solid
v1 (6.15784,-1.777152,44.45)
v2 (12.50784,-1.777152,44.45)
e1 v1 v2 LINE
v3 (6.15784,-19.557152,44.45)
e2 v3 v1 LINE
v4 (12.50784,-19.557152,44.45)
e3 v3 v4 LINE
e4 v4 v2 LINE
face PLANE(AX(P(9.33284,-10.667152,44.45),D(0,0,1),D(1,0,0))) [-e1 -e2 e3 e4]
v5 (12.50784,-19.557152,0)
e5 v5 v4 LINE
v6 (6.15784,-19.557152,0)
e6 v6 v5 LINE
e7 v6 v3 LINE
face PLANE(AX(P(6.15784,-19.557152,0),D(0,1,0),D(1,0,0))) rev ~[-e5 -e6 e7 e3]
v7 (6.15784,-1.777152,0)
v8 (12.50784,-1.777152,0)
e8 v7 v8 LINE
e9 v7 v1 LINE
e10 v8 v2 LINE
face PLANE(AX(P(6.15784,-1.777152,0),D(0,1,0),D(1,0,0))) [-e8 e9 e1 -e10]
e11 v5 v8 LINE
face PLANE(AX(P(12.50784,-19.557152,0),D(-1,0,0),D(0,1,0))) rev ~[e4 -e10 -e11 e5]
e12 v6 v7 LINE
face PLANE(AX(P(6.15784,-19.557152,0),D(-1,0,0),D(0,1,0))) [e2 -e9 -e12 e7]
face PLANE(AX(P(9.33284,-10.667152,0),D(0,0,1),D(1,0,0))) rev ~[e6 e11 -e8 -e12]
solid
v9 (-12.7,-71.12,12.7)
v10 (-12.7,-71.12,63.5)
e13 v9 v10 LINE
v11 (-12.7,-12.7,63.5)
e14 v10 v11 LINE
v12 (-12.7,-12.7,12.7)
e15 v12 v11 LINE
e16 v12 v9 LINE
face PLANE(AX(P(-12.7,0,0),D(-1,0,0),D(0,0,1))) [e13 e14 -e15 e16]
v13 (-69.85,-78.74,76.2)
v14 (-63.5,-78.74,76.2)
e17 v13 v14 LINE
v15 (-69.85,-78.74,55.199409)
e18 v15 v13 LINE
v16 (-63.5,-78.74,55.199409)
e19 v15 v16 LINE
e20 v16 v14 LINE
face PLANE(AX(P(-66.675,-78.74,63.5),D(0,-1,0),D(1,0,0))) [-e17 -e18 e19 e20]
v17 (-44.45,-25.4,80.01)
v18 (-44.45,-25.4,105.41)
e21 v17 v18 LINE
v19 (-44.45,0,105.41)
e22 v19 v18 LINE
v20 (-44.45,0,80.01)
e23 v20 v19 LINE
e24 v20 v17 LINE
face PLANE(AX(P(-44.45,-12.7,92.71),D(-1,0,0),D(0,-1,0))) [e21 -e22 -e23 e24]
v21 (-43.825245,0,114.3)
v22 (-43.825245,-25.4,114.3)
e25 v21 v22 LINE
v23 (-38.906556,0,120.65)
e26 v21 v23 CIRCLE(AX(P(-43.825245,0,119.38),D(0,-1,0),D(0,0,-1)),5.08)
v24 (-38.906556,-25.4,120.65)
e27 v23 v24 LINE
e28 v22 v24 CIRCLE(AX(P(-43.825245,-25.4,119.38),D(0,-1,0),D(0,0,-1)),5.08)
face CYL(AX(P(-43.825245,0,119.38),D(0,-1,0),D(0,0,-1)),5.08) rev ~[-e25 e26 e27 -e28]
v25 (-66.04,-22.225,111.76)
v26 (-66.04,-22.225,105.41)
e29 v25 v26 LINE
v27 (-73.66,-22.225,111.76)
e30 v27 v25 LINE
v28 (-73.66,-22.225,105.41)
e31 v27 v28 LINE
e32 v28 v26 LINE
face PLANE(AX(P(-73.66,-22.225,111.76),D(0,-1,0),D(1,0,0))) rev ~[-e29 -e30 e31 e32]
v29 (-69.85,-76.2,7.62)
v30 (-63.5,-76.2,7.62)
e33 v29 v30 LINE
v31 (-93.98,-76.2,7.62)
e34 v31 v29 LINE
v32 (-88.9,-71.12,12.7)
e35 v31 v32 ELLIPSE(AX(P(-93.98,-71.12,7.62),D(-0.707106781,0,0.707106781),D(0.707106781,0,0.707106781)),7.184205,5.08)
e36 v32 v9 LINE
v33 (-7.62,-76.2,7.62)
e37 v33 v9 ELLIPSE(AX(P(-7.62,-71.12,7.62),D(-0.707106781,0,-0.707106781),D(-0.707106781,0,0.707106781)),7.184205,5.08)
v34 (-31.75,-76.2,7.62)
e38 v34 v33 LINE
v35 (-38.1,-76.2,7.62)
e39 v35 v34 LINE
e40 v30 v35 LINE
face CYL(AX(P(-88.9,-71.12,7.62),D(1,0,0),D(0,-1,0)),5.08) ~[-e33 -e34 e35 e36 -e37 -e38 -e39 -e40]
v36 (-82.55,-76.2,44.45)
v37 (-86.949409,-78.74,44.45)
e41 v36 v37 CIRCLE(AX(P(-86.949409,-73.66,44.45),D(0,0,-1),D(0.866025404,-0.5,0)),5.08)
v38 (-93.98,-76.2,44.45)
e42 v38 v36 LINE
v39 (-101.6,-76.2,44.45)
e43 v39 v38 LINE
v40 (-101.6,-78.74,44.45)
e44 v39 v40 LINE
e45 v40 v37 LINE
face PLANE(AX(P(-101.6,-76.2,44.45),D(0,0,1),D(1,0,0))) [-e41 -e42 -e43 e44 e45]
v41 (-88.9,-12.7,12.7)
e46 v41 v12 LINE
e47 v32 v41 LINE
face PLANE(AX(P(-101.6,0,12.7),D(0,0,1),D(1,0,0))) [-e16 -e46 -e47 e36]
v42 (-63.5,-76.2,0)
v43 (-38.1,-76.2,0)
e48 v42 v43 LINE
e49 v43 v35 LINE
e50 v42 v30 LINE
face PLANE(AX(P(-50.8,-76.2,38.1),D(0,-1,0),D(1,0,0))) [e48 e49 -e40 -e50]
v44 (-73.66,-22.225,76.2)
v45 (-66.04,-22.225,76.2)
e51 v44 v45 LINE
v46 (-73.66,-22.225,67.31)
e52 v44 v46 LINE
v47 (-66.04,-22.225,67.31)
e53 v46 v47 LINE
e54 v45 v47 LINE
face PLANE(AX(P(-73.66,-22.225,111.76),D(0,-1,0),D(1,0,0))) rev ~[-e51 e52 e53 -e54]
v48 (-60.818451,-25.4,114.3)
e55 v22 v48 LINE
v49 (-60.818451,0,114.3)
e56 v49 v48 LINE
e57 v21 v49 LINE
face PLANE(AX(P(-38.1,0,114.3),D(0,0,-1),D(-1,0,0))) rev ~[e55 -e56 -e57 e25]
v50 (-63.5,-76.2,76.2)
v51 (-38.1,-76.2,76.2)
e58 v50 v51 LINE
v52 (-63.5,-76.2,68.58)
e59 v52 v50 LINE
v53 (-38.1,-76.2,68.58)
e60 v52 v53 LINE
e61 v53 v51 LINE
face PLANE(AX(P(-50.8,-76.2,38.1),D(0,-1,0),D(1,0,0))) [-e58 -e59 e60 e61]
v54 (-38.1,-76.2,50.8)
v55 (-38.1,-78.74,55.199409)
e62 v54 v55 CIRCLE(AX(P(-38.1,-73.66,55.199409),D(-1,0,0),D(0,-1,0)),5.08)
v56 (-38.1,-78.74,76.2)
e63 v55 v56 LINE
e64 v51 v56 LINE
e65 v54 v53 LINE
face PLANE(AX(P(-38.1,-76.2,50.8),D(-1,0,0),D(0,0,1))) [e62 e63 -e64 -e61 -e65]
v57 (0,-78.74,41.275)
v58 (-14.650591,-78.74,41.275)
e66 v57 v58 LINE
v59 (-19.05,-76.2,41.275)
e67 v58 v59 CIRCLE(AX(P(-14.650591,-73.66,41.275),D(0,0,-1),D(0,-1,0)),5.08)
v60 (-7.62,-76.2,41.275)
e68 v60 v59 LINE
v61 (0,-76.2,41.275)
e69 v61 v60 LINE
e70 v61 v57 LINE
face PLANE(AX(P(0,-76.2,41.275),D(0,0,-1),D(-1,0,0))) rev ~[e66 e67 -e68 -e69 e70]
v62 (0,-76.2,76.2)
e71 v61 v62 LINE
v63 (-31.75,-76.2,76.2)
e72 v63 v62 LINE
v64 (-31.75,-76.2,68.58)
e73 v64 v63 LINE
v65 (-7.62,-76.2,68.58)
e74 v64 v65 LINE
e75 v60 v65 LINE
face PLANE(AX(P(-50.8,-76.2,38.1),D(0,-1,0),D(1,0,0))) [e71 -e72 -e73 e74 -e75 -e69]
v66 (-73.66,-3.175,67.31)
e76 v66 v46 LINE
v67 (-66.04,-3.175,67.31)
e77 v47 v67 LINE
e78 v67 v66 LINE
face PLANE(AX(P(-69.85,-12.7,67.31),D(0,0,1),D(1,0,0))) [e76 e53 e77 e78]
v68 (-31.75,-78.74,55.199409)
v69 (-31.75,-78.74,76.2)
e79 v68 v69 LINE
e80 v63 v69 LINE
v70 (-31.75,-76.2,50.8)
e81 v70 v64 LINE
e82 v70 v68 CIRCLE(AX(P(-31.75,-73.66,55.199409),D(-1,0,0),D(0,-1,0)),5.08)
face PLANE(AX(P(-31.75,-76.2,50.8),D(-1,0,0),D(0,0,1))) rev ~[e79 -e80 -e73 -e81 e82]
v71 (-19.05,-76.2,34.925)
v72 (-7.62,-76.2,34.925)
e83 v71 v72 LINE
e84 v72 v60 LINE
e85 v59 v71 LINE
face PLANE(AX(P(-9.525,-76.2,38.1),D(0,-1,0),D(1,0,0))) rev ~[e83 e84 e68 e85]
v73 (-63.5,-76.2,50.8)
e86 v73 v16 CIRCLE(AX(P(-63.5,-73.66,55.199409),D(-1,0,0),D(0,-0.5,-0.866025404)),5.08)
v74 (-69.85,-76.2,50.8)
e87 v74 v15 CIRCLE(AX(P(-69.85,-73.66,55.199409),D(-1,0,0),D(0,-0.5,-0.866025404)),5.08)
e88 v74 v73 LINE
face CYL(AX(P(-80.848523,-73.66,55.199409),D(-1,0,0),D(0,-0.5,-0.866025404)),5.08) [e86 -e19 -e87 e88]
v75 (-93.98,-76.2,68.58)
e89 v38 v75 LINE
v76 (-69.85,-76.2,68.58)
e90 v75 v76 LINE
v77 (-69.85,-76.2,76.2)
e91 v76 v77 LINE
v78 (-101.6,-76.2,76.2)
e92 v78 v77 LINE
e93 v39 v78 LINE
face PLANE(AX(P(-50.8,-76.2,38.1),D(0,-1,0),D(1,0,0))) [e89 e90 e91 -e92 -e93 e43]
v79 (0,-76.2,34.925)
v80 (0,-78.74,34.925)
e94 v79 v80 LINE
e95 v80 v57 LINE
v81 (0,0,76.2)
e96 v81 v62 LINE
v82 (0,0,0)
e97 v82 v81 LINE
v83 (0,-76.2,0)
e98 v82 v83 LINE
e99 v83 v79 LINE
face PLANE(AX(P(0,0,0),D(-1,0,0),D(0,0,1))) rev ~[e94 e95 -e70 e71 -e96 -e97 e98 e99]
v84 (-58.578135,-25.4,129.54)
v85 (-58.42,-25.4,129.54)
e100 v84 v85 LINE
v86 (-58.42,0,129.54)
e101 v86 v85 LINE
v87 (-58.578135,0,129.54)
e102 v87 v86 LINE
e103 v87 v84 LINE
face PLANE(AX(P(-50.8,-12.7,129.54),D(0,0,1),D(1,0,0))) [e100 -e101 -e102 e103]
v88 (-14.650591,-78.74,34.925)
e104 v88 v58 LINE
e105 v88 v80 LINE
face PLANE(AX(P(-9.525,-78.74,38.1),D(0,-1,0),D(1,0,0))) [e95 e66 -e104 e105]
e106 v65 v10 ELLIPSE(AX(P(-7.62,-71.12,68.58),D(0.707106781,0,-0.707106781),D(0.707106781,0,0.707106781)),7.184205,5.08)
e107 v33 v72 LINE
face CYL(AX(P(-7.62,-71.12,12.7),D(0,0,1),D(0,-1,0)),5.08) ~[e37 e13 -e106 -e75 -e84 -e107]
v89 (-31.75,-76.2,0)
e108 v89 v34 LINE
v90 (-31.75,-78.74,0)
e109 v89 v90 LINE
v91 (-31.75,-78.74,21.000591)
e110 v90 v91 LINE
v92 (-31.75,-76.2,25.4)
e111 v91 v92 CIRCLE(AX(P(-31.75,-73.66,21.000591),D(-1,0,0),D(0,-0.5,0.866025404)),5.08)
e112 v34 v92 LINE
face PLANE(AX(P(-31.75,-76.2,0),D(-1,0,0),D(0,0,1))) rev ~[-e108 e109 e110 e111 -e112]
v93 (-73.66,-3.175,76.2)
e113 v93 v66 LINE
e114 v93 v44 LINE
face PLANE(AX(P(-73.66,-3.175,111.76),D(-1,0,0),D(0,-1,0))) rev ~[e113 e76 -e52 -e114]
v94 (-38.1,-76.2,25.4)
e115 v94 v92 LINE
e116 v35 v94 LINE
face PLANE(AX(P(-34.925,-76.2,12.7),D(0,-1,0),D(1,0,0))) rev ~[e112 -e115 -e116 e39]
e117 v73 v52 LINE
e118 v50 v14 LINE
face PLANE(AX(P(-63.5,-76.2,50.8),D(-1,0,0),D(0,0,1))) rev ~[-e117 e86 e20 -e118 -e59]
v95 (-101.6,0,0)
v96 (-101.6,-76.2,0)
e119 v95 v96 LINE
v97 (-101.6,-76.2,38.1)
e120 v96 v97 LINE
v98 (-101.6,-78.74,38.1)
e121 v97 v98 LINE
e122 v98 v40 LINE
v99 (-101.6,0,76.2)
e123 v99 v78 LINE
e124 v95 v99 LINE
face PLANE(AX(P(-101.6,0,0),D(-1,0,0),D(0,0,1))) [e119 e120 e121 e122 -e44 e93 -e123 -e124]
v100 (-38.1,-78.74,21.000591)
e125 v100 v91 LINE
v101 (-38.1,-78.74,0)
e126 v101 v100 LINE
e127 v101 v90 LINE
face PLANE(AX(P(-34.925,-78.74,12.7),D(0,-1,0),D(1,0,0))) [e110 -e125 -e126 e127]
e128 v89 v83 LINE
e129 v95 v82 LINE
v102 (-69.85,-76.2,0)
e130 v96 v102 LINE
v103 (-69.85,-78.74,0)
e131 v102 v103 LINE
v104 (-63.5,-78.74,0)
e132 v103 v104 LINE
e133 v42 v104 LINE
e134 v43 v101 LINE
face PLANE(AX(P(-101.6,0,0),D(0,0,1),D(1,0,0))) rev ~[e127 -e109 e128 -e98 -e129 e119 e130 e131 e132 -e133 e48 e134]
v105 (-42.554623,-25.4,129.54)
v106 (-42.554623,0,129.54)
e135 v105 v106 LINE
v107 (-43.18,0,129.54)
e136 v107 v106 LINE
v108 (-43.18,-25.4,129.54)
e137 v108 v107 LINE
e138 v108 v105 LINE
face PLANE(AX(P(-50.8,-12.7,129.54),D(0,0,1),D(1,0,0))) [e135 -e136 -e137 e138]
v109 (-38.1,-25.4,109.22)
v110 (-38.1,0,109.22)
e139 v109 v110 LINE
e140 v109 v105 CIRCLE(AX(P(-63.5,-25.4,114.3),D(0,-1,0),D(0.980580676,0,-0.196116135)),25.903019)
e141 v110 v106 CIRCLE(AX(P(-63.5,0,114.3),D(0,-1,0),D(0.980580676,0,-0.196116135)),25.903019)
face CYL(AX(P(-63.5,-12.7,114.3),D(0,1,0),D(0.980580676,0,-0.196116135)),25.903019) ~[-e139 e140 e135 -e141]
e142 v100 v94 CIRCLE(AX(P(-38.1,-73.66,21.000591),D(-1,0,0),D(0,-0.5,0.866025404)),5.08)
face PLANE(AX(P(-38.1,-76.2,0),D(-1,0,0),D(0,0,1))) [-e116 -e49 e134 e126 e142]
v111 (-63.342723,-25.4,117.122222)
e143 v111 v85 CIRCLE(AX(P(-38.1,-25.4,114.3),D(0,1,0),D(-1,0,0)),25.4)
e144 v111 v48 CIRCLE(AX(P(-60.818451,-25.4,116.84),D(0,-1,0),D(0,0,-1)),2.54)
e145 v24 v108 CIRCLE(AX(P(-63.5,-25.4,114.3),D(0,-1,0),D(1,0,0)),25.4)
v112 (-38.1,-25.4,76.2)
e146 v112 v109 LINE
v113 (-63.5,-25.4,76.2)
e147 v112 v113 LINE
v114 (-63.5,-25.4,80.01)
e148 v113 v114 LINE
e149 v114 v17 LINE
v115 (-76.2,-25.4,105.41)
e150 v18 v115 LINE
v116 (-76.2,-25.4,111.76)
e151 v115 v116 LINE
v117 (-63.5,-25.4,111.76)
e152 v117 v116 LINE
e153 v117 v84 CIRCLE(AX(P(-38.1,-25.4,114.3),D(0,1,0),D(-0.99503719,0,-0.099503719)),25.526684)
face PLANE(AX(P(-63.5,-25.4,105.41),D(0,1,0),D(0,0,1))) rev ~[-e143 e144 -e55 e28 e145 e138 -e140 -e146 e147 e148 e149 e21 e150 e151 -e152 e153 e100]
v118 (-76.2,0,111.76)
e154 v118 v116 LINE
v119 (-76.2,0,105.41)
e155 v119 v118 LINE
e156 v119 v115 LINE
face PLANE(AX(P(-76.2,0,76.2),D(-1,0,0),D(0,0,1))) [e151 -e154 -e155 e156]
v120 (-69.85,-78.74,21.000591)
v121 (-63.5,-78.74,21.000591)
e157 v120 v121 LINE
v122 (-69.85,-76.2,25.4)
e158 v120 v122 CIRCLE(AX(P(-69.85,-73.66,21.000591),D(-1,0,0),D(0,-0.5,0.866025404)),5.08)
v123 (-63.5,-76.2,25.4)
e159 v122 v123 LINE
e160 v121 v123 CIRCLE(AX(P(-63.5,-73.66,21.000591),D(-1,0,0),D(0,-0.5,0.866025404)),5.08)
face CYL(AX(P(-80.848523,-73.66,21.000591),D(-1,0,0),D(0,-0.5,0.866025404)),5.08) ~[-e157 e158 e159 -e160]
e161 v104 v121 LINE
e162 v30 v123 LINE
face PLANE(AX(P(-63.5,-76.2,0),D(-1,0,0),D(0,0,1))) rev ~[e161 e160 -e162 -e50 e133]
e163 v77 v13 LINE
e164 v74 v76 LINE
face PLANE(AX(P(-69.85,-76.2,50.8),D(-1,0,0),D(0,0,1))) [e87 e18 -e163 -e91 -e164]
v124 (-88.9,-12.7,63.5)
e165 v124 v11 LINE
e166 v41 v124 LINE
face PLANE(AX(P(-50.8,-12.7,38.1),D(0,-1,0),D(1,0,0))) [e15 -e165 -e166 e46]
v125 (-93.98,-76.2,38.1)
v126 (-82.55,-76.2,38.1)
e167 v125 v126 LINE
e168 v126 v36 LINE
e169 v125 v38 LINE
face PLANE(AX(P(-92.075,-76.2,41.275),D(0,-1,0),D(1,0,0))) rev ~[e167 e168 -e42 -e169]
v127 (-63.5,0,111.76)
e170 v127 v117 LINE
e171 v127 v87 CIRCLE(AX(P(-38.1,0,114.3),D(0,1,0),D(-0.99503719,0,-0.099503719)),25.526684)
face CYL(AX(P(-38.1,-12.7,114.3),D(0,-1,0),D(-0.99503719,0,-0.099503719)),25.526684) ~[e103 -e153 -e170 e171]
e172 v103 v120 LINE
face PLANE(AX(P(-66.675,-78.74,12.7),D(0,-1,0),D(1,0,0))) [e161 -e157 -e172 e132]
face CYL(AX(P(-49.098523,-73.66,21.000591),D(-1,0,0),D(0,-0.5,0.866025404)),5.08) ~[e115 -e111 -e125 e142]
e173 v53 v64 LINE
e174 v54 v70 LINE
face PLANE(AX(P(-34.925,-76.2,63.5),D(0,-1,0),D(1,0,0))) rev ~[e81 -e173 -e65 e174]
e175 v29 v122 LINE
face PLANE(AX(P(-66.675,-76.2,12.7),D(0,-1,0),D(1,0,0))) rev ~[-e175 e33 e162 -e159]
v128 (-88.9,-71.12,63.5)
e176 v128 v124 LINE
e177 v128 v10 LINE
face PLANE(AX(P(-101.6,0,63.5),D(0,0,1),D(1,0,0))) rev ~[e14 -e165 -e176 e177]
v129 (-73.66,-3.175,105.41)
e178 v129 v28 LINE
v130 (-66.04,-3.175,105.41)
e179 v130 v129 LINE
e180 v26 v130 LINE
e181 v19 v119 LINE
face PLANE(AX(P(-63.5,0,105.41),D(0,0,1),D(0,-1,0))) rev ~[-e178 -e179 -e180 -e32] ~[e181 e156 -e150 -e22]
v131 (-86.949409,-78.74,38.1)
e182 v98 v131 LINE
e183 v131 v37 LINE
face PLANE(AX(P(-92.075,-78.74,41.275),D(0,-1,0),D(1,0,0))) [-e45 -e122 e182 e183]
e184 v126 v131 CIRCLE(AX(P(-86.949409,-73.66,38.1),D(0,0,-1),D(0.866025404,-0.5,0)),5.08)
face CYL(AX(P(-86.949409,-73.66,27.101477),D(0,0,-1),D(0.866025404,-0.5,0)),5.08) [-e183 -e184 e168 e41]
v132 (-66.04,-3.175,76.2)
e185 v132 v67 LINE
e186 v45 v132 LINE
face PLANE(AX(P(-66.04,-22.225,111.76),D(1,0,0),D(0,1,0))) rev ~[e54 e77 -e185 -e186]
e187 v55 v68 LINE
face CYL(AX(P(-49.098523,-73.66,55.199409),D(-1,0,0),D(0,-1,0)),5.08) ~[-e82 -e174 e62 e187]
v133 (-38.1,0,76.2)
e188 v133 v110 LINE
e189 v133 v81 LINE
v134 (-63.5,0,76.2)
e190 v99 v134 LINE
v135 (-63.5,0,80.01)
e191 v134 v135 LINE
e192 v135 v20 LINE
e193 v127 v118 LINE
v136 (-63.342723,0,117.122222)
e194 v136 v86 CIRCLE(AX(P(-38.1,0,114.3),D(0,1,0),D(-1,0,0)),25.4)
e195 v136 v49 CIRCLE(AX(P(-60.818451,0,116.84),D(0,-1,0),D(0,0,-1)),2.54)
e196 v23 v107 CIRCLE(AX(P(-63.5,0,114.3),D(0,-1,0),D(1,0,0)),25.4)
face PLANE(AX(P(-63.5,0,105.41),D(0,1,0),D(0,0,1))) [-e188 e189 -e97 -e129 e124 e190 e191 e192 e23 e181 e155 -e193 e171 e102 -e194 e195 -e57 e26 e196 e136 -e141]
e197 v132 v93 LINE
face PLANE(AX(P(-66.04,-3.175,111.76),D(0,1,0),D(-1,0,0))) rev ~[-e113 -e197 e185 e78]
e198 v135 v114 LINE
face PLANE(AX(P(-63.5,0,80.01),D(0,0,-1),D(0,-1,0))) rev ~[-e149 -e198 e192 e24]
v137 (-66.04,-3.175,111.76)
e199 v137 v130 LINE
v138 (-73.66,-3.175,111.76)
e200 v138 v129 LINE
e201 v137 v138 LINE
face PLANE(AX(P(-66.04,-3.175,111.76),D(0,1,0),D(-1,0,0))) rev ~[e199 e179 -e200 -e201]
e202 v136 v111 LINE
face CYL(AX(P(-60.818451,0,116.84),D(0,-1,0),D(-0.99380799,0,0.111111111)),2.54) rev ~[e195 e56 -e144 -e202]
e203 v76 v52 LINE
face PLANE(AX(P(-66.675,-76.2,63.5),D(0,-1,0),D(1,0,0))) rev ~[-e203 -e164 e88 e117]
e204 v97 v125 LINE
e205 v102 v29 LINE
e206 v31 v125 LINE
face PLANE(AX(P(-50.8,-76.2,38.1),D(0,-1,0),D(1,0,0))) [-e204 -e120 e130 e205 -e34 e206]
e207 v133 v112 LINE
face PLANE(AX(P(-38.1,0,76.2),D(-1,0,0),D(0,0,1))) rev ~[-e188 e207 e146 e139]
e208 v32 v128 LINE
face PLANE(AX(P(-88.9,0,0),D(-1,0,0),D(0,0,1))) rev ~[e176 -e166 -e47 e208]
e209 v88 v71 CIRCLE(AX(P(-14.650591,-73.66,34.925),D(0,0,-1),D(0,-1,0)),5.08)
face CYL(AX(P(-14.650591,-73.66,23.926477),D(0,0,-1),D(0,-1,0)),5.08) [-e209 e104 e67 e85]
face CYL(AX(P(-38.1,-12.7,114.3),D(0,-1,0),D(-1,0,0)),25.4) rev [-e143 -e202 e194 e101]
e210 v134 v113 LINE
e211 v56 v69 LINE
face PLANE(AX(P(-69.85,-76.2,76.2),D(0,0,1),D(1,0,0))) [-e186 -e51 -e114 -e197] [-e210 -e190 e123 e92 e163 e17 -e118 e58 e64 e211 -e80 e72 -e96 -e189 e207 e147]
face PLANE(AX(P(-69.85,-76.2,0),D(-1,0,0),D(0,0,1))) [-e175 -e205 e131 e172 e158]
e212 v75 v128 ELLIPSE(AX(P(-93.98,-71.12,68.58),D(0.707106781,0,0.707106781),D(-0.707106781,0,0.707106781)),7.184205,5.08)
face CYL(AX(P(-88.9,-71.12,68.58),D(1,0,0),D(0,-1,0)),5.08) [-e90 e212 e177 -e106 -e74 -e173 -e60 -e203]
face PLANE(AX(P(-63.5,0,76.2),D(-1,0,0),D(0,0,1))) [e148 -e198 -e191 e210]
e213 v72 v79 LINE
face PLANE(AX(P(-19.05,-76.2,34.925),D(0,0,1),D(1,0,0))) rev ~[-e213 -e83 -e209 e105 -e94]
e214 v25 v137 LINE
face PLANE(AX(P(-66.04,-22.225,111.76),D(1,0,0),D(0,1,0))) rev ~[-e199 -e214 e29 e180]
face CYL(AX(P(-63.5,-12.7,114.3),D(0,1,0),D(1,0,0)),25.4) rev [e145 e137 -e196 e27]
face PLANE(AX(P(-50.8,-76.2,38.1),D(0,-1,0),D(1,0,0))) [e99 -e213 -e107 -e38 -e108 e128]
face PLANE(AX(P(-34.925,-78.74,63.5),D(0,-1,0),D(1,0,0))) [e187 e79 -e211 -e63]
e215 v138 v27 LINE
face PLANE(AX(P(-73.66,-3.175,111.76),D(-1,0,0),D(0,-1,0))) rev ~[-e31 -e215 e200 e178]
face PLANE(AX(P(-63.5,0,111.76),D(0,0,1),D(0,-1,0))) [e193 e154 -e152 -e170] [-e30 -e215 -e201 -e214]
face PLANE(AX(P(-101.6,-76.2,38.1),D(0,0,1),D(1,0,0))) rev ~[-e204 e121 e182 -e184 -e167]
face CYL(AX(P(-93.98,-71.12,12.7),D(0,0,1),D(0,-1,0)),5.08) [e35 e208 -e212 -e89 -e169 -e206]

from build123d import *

# Parameters (mm, degrees)
F0_W        = 101.6
F0_H        = 76.2
F1_DEPTH    = 76.2
F2_T        = -12.7
F3_R        = 5.08
F4_W        = 6.35
F4_H        = 25.4
F4_W_2      = 19.05
F4_H_2      = 6.35
F5_DEPTH    = 2.54
F6_T1_DEPTH = 28.3470452561
F6_T3_DEPTH = 28.3470452561
F6_T5_DEPTH = 28.3470452561
F6_T7_DEPTH = 28.3470452561
F7_W        = 25.4
F7_H        = 38.1
F8_DEPTH    = 25.4
F9_W        = 25.4
F9_H        = 2.54
F10_ANGLE   = 45
F11_W       = 25.4
F11_H       = 5.08
F12_ANGLE   = 60
F13_START   = 15.24
F8_FACE2_W  = 25.4
F8_FACE2_H  = 25.4
F13_DEPTH   = 10.16
F14_R       = 2.54
F15_R       = 5.08
F16_W       = 25.4
F16_H       = 25.4
F17_DEPTH   = 19.05
F18_DEPTH   = 12.7
F20_DEPTH   = 44.45
F21_W       = 6.35
F21_H       = 17.78
F22_DEPTH   = 44.45


# Not quite as in the source:
# - a fillet or chamfer that OpenCascade refuses, or shapes differently, is made with other operations: its cross-section is extruded or revolved along the edge and cut away or added


with BuildPart() as f1:
    # F0 (on Front) → F1 (new body)
    with BuildSketch(Plane.XZ):
        with Locations((-50.8, 38.1)):
            Rectangle(F0_W, F0_H)
    extrude(amount=F1_DEPTH)

    # F2
    f2_openings = [f1.faces().sort_by_distance(p)[0] for p in [
        (-50.8, -76.2, 38.1),
    ]]
    offset(amount=F2_T, openings=f2_openings)

    # F3
    f3_edges = [f1.edges().sort_by_distance(p)[0] for p in [
        (-88.9, -76.2, 38.1),
        (-50.8, -76.2, 63.5),
        (-12.7, -76.2, 38.1),
        (-50.8, -76.2, 12.7),
    ]]
    fillet(f3_edges, radius=F3_R)

    # F4 (on face) → F5 (join)
    with BuildSketch(Plane.XZ.offset(76.2)):
        with Locations((-66.675, 63.5)):
            Rectangle(F4_W, F4_H)
        with Locations((-34.925, 63.5)):
            Rectangle(F4_W, F4_H)
        with Locations((-92.075, 41.275)):
            Rectangle(F4_W_2, F4_H_2)
        Polygon((0, 41.275), (-12.7, 41.275), (-19.05, 41.275), (-19.05, 34.925), (0, 34.925), align=None)
        with Locations((-66.675, 12.7)):
            Rectangle(F4_W, F4_H)
        with Locations((-34.925, 12.7)):
            Rectangle(F4_W, F4_H)
    extrude(amount=F5_DEPTH)

    # F6: fillet of radius 5.08 on 6 edges, made by hand

    # F6_s2 → F6_t1 (cut)
    with BuildSketch(Plane.XY.offset(27.1014773719)):
        with BuildLine():
            ThreePointArc((-82.55, -76.2), (-84.4094090512, -78.0594090512), (-86.9494090512, -78.74))
            Line((-86.9494090512, -78.74), (-82.55, -78.74))
            Line((-82.55, -78.74), (-82.55, -76.2))
        make_face()
    extrude(amount=F6_T1_DEPTH, mode=Mode.SUBTRACT)

    # F6_s4 → F6_t3 (cut)
    with BuildSketch(Plane.YZ.offset(-80.8485226281)):
        with BuildLine():
            ThreePointArc((-76.2, 50.8), (-78.0594090512, 52.6594090512), (-78.74, 55.1994090512))
            Line((-78.74, 55.1994090512), (-78.74, 50.8))
            Line((-78.74, 50.8), (-76.2, 50.8))
        make_face()
        with BuildLine():
            ThreePointArc((-76.2, 25.4), (-78.0594090512, 23.5405909488), (-78.74, 21.0005909488))
            Line((-78.74, 21.0005909488), (-78.74, 25.4))
            Line((-78.74, 25.4), (-76.2, 25.4))
        make_face()
    extrude(amount=F6_T3_DEPTH, mode=Mode.SUBTRACT)

    # F6_s6 → F6_t5 (cut)
    with BuildSketch(Plane.YZ.offset(-49.0985226281)):
        with BuildLine():
            ThreePointArc((-78.74, 55.1994090512), (-78.0594090512, 52.6594090512), (-76.2, 50.8))
            Line((-76.2, 50.8), (-78.74, 50.8))
            Line((-78.74, 50.8), (-78.74, 55.1994090512))
        make_face()
        with BuildLine():
            ThreePointArc((-76.2, 25.4), (-78.0594090512, 23.5405909488), (-78.74, 21.0005909488))
            Line((-78.74, 21.0005909488), (-78.74, 25.4))
            Line((-78.74, 25.4), (-76.2, 25.4))
        make_face()
    extrude(amount=F6_T5_DEPTH, mode=Mode.SUBTRACT)

    # F6_s8 → F6_t7 (cut)
    with BuildSketch(Plane.XY.offset(23.9264773719)):
        with BuildLine():
            ThreePointArc((-14.6505909488, -78.74), (-17.1905909488, -78.0594090512), (-19.05, -76.2))
            Line((-19.05, -76.2), (-19.05, -78.74))
            Line((-19.05, -78.74), (-14.6505909488, -78.74))
        make_face()
    extrude(amount=F6_T7_DEPTH, mode=Mode.SUBTRACT)

    # F7 (on face) → F8 (join)
    with BuildSketch(Plane(origin=(0, 0, 0), x_dir=(-1, 0, 0), z_dir=(0, 1, 0))):
        with Locations((50.8, 95.25)):
            Rectangle(F7_W, F7_H)
    extrude(amount=-F8_DEPTH)

    # F9 (on face) → F10 (revolve)
    with BuildSketch(Plane(origin=(-63.5, 0, 0), x_dir=(0, -1, 0), z_dir=(-1, 0, 0))):
        with Locations((12.7, 113.03)):
            Rectangle(F9_W, F9_H)
    revolve(axis=Axis((-38.1, -12.7, 114.3), (0, 1, 0)), revolution_arc=F10_ANGLE)

    # F11 (on face) → F12 (revolve)
    with BuildSketch(Plane.YZ.offset(-38.1)):
        with Locations((-12.7, 111.76)):
            Rectangle(F11_W, F11_H)
    revolve(axis=Axis((-63.5, -12.7, 114.3), (0, -1, 0)), revolution_arc=F12_ANGLE)

    # F8_face2 (on face) → F13 (cut)
    with BuildSketch(Plane(origin=(-50.8, -12.7, 114.3), x_dir=(1, 0, 0), z_dir=(0, 0, 1)).offset(F13_START)):
        Rectangle(F8_FACE2_W, F8_FACE2_H)
    extrude(amount=F13_DEPTH, mode=Mode.SUBTRACT)

    # F14
    f14_edges = [f1.edges().sort_by_distance(p)[0] for p in [
        (-63.5, -12.7, 114.3),
    ]]
    fillet(f14_edges, radius=F14_R)

    # F15
    f15_edges = [f1.edges().sort_by_distance(p)[0] for p in [
        (-38.1, -12.7, 114.3),
    ]]
    fillet(f15_edges, radius=F15_R)

    # F16 (on face) → F17 (cut)
    with BuildSketch(Plane(origin=(-63.5, 0, 0), x_dir=(0, -1, 0), z_dir=(-1, 0, 0))):
        with Locations((12.7, 92.71)):
            Rectangle(F16_W, F16_H)
    extrude(amount=-F17_DEPTH, mode=Mode.SUBTRACT)

    # F18 (add): a face of the model
    f18_faces = [f1.faces().sort_by_distance(p)[0] for p in [
        (-63.5, -12.7, 108.585),
    ]]
    extrude(f18_faces, amount=F18_DEPTH)

    # F19 (on face) → F20 (cut)
    with BuildSketch(Plane.XY.offset(111.76)):
        with BuildLine():
            ThreePointArc((-73.66, -12.7000000431), (-69.8499999784, -16.51), (-66.04, -12.7))
            ThreePointArc((-66.04, -12.7), (-69.8500000216, -8.89), (-73.66, -12.7000000431))
        make_face()
        with BuildLine():
            Line((-66.04, -22.225), (-66.04, -12.7))
            ThreePointArc((-66.04, -12.7), (-69.8499999784, -16.51), (-73.66, -12.7000000431))
            Line((-73.66, -12.7000000431), (-73.66, -22.225))
            Line((-73.66, -22.225), (-66.04, -22.225))
        make_face()
        with BuildLine():
            ThreePointArc((-73.66, -12.7000000431), (-69.8500000216, -8.89), (-66.04, -12.7))
            Line((-66.04, -12.7), (-66.04, -3.175))
            Line((-66.04, -3.175), (-73.66, -3.175))
            Line((-73.66, -3.175), (-73.66, -12.7000000431))
        make_face()
    extrude(amount=-F20_DEPTH, mode=Mode.SUBTRACT)


with BuildPart() as f22:
    # F21 (on Top) → F22 (new body)
    with BuildSketch(Plane.XY):
        with Locations((9.3328396462, -10.6671517172)):
            Rectangle(F21_W, F21_H)
    extrude(amount=F22_DEPTH)


solid = Compound([f1.part, f22.part])
